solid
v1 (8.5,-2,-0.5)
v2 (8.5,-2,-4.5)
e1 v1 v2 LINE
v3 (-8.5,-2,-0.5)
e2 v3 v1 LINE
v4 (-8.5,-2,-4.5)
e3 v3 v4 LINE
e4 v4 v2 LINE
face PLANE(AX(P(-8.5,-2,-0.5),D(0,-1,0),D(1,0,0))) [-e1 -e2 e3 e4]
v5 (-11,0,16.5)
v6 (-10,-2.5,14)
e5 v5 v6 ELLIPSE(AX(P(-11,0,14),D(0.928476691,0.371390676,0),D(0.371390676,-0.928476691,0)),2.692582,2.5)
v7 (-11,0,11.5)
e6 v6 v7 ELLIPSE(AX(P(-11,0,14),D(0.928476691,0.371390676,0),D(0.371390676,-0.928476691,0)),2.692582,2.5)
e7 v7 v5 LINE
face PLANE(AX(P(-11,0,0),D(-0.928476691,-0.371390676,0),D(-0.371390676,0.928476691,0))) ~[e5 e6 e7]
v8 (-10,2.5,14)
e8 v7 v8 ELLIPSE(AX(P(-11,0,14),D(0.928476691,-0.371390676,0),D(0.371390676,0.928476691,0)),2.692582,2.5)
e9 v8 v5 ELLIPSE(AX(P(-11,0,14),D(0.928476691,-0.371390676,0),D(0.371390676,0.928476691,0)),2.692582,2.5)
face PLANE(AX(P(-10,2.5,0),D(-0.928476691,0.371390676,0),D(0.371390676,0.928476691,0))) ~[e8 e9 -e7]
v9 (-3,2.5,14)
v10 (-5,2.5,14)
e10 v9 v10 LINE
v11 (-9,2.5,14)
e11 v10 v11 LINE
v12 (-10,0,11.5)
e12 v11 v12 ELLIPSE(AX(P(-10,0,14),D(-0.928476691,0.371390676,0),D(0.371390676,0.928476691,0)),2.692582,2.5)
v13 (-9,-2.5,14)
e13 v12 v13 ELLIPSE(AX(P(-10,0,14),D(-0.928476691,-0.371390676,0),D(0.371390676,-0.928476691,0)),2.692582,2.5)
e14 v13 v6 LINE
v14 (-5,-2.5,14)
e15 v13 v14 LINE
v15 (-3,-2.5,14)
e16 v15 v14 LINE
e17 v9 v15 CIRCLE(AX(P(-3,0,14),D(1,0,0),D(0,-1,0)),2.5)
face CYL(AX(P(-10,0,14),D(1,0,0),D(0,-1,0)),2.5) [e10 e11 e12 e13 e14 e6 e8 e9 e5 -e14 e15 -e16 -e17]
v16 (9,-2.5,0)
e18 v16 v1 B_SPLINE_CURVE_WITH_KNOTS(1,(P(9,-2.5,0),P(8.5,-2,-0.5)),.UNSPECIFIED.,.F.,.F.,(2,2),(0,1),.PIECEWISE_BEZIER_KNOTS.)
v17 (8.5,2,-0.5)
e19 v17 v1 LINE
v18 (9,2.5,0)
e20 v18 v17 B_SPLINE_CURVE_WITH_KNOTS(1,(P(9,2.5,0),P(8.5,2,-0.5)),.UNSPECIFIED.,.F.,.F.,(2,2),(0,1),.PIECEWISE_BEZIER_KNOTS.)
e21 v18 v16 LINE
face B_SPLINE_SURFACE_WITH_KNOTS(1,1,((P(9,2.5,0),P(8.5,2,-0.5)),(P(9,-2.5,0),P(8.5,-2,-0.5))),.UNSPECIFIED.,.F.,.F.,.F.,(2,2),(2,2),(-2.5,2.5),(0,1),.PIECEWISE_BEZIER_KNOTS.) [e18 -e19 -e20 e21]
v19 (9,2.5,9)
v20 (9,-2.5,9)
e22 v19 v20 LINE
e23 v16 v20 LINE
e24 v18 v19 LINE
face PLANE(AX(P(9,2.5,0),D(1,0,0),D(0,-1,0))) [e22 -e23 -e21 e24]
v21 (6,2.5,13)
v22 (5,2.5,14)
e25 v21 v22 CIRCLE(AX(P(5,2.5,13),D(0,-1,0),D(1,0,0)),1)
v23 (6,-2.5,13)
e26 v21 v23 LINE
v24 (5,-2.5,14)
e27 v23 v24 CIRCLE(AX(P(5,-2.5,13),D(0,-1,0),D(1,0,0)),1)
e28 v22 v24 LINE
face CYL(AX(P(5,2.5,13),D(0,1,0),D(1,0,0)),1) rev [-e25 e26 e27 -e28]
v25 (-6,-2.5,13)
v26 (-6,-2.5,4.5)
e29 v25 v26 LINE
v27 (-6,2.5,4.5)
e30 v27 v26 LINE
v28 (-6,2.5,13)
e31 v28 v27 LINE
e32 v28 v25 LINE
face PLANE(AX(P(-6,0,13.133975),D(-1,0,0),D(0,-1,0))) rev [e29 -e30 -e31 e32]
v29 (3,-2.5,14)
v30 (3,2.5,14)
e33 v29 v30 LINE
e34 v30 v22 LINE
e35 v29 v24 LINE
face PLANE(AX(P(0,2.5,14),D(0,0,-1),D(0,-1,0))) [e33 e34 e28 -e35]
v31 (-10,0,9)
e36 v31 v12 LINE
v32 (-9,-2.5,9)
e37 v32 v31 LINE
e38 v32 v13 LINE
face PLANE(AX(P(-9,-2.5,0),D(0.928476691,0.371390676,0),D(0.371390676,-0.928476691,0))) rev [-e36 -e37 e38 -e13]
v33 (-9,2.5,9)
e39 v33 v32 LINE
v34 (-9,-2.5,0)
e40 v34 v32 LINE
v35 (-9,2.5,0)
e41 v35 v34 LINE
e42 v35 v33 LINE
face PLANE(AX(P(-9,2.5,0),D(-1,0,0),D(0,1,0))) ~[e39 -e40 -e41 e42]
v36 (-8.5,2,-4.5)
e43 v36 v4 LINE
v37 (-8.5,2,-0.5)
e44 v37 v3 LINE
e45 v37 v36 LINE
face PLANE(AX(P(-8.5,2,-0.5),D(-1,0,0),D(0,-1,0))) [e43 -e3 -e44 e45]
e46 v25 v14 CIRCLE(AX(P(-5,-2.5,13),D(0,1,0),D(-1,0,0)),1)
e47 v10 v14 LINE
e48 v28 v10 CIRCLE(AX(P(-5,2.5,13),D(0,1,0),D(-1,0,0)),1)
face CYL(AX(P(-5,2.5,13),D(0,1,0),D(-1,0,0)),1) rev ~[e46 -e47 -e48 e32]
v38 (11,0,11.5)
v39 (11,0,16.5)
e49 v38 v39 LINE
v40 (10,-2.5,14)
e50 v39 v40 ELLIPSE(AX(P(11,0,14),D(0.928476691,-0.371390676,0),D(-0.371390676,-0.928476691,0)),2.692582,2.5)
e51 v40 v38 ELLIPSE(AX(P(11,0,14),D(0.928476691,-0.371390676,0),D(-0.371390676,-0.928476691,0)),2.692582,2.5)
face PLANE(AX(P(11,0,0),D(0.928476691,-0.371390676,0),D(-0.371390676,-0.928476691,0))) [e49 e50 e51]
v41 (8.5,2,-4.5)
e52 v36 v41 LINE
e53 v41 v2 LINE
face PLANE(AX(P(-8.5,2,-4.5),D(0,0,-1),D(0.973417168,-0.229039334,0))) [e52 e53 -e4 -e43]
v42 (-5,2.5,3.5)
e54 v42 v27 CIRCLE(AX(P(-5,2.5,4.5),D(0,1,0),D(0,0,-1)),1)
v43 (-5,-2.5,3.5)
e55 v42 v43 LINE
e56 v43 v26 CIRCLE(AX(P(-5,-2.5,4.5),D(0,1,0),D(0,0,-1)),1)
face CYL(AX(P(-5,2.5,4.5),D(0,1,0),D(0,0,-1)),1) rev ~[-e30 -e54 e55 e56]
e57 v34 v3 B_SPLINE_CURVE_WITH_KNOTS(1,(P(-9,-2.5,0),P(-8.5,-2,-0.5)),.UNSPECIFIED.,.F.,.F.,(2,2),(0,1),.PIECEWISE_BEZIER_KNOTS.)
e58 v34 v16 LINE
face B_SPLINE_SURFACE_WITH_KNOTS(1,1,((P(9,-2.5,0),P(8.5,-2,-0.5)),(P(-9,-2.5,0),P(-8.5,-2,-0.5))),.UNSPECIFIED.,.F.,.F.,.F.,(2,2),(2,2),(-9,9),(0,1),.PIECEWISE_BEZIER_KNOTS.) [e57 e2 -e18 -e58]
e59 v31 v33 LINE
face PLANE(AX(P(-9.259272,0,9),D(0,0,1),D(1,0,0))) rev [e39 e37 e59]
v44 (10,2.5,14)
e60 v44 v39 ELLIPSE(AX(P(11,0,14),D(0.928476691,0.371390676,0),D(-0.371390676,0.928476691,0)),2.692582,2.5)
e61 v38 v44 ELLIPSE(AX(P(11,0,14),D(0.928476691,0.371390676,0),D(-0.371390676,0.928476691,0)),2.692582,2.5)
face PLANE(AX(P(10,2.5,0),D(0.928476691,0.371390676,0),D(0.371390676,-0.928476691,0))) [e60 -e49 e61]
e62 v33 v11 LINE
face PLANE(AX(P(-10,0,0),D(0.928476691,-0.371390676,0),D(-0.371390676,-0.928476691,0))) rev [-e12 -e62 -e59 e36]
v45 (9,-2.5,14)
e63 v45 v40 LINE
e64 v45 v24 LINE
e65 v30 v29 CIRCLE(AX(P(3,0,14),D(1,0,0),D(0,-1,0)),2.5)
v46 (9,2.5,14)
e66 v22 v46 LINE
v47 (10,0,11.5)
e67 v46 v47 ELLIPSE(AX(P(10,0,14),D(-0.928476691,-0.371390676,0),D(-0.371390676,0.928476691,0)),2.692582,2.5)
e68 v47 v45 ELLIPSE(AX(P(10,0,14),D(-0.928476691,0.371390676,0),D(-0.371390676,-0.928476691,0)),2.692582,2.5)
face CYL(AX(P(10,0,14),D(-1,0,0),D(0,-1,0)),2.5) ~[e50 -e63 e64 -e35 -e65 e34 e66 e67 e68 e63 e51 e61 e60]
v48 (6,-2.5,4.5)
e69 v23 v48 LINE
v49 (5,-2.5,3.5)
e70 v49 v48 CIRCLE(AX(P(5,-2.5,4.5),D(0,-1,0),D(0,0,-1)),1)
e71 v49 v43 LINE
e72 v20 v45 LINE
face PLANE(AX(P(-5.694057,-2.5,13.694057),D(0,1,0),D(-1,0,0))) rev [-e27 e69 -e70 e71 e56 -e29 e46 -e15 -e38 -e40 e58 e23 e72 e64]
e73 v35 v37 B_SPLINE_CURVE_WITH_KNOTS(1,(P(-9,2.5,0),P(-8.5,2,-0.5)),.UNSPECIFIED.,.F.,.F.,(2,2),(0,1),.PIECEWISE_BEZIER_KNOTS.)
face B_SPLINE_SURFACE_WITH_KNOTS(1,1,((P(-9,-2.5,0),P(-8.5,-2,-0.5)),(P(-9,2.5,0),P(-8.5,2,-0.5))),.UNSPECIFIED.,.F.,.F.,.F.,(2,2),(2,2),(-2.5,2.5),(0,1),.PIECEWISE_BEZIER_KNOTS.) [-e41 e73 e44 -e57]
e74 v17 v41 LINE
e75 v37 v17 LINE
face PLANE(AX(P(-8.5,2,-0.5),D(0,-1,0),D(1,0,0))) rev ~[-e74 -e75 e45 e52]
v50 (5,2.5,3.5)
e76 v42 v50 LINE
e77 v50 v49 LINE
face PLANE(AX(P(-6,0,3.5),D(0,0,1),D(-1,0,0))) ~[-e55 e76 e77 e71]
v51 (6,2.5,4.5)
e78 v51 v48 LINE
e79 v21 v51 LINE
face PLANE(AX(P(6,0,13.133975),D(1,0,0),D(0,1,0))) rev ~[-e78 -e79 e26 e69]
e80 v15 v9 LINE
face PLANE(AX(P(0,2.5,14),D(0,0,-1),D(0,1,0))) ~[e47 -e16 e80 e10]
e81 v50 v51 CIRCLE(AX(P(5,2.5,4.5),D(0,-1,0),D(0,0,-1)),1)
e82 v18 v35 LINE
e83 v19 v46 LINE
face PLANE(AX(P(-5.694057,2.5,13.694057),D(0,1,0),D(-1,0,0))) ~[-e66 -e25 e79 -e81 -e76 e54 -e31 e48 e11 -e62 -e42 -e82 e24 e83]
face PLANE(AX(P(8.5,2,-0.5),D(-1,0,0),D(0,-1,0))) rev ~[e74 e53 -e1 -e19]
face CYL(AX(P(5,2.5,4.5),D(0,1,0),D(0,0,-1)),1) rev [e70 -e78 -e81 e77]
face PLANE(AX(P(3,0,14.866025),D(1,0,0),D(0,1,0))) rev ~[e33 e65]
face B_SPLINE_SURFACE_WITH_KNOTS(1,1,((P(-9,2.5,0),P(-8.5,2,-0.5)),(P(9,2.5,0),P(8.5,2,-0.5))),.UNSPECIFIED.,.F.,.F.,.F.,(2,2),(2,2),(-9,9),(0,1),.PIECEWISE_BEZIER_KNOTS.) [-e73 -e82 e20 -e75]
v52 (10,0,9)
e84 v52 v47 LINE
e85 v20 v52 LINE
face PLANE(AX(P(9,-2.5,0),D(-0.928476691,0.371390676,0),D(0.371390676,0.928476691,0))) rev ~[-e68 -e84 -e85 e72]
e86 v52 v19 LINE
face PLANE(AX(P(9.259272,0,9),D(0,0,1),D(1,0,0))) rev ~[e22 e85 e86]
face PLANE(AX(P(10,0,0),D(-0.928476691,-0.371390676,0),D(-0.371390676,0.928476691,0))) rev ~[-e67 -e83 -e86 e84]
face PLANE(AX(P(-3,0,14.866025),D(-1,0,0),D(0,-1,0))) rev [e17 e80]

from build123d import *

# Parameters (mm, degrees)
F2_DEPTH    = 2.5
F3_DEPTH    = 10
F4_DEPTH    = 3
F5_DEPTH    = 6
F6_T1_DEPTH = 5
F8_DEPTH    = 14
F9_DEPTH    = 9
F10_DEPTH   = 1
F11_DEPTH   = 16.5
F12_FACE_W  = 18
F12_FACE_H  = 5
F13_DEPTH   = 0.5
F13_TAPER   = 45
F14_DEPTH   = 4


# Not quite as in the source:
# - a fillet or chamfer that OpenCascade refuses, or shapes differently, is made with other operations: its cross-section is extruded or revolved along the edge and cut away or added


with BuildPart() as f2:
    # F0 (on Front) → F2 (new body, symmetric)
    with BuildSketch(Plane.XZ):
        Polygon((0, 3.5), (0, 0), (9, 0), (9, 14), (6, 14), (6, 3.5), align=None)
    extrude(amount=F2_DEPTH, both=True)

    # F1 (on Right) → F3 (join)
    with BuildSketch(Plane.YZ):
        with BuildLine():
            Line((-2.5, 14), (2.5, 14))
            ThreePointArc((2.5, 14), (0, 16.5), (-2.5, 14))
        make_face()
        with BuildLine():
            ThreePointArc((-2.5, 14), (0, 11.5), (2.5, 14))
            Line((2.5, 14), (-2.5, 14))
        make_face()
    extrude(amount=F3_DEPTH)

    # F1 (on Right) → F4 (cut)
    with BuildSketch(Plane.YZ):
        with BuildLine():
            Line((-2.5, 14), (2.5, 14))
            ThreePointArc((2.5, 14), (0, 16.5), (-2.5, 14))
        make_face()
        with BuildLine():
            ThreePointArc((-2.5, 14), (0, 11.5), (2.5, 14))
            Line((2.5, 14), (-2.5, 14))
        make_face()
    extrude(amount=F4_DEPTH, mode=Mode.SUBTRACT)

    # F1 (on Right) → F5 (cut)
    with BuildSketch(Plane.YZ):
        with BuildLine():
            ThreePointArc((-2.5, 14), (0, 11.5), (2.5, 14))
            Line((2.5, 14), (-2.5, 14))
        make_face()
    extrude(amount=F5_DEPTH, mode=Mode.SUBTRACT)

    # F6: fillet of radius 1 on 2 edges, made by hand

    # F6_s2 → F6_t1 (join)
    with BuildSketch(Plane.XZ.offset(-2.5)):
        with BuildLine():
            ThreePointArc((6, 13), (5.7071067812, 13.7071067812), (5, 14))
            Line((5, 14), (6, 14))
            Line((6, 14), (6, 13))
        make_face()
        with BuildLine():
            ThreePointArc((5, 3.5), (5.7071067812, 3.7928932188), (6, 4.5))
            Line((6, 4.5), (6, 3.5))
            Line((6, 3.5), (5, 3.5))
        make_face()
    extrude(amount=F6_T1_DEPTH)

    # F7 (on Top) → F8 (join)
    with BuildSketch(Plane.XY):
        Polygon((9, 2.5), (9, -2.5), (10, 0), align=None)
    extrude(amount=F8_DEPTH)

    # F7 (on Top) → F9 (cut)
    with BuildSketch(Plane.XY):
        Polygon((9, 2.5), (9, -2.5), (10, 0), align=None)
    extrude(amount=F9_DEPTH, mode=Mode.SUBTRACT)

    # F10 (add): a face of the model
    f10_faces = [f2.faces().sort_by_distance(p)[0] for p in [
        (10, -1.717766953, 12.282233047),
    ]]
    extrude(f10_faces, amount=F10_DEPTH)

    # F7 (on Top) → F11 (cut)
    with BuildSketch(Plane.XY):
        Polygon((11, 0), (10, -2.5), (11.5, -2.5), (11.5, 2.5), (10, 2.5), align=None)
    extrude(amount=F11_DEPTH, mode=Mode.SUBTRACT)

    # F12: F2 across face


with BuildPart() as f2_1:
    add(f2.part)
    add(f2.part.mirror(Plane(origin=(0, 0, 1.75), x_dir=(0, -1, 0), z_dir=(-1, 0, 0))))

    # F12_face (on face) → F13 (join)
    with BuildSketch(Plane(origin=(0, 0, 0), x_dir=(1, 0, 0), z_dir=(0, 0, -1))):
        Rectangle(F12_FACE_W, F12_FACE_H)
    extrude(amount=F13_DEPTH, taper=F13_TAPER)

    # F14 (add): a face of the model
    f14_faces = [f2_1.faces().sort_by_distance(p)[0] for p in [
        (0, 0, -0.5),
    ]]
    extrude(f14_faces, amount=F14_DEPTH)


solid = f2_1.part
